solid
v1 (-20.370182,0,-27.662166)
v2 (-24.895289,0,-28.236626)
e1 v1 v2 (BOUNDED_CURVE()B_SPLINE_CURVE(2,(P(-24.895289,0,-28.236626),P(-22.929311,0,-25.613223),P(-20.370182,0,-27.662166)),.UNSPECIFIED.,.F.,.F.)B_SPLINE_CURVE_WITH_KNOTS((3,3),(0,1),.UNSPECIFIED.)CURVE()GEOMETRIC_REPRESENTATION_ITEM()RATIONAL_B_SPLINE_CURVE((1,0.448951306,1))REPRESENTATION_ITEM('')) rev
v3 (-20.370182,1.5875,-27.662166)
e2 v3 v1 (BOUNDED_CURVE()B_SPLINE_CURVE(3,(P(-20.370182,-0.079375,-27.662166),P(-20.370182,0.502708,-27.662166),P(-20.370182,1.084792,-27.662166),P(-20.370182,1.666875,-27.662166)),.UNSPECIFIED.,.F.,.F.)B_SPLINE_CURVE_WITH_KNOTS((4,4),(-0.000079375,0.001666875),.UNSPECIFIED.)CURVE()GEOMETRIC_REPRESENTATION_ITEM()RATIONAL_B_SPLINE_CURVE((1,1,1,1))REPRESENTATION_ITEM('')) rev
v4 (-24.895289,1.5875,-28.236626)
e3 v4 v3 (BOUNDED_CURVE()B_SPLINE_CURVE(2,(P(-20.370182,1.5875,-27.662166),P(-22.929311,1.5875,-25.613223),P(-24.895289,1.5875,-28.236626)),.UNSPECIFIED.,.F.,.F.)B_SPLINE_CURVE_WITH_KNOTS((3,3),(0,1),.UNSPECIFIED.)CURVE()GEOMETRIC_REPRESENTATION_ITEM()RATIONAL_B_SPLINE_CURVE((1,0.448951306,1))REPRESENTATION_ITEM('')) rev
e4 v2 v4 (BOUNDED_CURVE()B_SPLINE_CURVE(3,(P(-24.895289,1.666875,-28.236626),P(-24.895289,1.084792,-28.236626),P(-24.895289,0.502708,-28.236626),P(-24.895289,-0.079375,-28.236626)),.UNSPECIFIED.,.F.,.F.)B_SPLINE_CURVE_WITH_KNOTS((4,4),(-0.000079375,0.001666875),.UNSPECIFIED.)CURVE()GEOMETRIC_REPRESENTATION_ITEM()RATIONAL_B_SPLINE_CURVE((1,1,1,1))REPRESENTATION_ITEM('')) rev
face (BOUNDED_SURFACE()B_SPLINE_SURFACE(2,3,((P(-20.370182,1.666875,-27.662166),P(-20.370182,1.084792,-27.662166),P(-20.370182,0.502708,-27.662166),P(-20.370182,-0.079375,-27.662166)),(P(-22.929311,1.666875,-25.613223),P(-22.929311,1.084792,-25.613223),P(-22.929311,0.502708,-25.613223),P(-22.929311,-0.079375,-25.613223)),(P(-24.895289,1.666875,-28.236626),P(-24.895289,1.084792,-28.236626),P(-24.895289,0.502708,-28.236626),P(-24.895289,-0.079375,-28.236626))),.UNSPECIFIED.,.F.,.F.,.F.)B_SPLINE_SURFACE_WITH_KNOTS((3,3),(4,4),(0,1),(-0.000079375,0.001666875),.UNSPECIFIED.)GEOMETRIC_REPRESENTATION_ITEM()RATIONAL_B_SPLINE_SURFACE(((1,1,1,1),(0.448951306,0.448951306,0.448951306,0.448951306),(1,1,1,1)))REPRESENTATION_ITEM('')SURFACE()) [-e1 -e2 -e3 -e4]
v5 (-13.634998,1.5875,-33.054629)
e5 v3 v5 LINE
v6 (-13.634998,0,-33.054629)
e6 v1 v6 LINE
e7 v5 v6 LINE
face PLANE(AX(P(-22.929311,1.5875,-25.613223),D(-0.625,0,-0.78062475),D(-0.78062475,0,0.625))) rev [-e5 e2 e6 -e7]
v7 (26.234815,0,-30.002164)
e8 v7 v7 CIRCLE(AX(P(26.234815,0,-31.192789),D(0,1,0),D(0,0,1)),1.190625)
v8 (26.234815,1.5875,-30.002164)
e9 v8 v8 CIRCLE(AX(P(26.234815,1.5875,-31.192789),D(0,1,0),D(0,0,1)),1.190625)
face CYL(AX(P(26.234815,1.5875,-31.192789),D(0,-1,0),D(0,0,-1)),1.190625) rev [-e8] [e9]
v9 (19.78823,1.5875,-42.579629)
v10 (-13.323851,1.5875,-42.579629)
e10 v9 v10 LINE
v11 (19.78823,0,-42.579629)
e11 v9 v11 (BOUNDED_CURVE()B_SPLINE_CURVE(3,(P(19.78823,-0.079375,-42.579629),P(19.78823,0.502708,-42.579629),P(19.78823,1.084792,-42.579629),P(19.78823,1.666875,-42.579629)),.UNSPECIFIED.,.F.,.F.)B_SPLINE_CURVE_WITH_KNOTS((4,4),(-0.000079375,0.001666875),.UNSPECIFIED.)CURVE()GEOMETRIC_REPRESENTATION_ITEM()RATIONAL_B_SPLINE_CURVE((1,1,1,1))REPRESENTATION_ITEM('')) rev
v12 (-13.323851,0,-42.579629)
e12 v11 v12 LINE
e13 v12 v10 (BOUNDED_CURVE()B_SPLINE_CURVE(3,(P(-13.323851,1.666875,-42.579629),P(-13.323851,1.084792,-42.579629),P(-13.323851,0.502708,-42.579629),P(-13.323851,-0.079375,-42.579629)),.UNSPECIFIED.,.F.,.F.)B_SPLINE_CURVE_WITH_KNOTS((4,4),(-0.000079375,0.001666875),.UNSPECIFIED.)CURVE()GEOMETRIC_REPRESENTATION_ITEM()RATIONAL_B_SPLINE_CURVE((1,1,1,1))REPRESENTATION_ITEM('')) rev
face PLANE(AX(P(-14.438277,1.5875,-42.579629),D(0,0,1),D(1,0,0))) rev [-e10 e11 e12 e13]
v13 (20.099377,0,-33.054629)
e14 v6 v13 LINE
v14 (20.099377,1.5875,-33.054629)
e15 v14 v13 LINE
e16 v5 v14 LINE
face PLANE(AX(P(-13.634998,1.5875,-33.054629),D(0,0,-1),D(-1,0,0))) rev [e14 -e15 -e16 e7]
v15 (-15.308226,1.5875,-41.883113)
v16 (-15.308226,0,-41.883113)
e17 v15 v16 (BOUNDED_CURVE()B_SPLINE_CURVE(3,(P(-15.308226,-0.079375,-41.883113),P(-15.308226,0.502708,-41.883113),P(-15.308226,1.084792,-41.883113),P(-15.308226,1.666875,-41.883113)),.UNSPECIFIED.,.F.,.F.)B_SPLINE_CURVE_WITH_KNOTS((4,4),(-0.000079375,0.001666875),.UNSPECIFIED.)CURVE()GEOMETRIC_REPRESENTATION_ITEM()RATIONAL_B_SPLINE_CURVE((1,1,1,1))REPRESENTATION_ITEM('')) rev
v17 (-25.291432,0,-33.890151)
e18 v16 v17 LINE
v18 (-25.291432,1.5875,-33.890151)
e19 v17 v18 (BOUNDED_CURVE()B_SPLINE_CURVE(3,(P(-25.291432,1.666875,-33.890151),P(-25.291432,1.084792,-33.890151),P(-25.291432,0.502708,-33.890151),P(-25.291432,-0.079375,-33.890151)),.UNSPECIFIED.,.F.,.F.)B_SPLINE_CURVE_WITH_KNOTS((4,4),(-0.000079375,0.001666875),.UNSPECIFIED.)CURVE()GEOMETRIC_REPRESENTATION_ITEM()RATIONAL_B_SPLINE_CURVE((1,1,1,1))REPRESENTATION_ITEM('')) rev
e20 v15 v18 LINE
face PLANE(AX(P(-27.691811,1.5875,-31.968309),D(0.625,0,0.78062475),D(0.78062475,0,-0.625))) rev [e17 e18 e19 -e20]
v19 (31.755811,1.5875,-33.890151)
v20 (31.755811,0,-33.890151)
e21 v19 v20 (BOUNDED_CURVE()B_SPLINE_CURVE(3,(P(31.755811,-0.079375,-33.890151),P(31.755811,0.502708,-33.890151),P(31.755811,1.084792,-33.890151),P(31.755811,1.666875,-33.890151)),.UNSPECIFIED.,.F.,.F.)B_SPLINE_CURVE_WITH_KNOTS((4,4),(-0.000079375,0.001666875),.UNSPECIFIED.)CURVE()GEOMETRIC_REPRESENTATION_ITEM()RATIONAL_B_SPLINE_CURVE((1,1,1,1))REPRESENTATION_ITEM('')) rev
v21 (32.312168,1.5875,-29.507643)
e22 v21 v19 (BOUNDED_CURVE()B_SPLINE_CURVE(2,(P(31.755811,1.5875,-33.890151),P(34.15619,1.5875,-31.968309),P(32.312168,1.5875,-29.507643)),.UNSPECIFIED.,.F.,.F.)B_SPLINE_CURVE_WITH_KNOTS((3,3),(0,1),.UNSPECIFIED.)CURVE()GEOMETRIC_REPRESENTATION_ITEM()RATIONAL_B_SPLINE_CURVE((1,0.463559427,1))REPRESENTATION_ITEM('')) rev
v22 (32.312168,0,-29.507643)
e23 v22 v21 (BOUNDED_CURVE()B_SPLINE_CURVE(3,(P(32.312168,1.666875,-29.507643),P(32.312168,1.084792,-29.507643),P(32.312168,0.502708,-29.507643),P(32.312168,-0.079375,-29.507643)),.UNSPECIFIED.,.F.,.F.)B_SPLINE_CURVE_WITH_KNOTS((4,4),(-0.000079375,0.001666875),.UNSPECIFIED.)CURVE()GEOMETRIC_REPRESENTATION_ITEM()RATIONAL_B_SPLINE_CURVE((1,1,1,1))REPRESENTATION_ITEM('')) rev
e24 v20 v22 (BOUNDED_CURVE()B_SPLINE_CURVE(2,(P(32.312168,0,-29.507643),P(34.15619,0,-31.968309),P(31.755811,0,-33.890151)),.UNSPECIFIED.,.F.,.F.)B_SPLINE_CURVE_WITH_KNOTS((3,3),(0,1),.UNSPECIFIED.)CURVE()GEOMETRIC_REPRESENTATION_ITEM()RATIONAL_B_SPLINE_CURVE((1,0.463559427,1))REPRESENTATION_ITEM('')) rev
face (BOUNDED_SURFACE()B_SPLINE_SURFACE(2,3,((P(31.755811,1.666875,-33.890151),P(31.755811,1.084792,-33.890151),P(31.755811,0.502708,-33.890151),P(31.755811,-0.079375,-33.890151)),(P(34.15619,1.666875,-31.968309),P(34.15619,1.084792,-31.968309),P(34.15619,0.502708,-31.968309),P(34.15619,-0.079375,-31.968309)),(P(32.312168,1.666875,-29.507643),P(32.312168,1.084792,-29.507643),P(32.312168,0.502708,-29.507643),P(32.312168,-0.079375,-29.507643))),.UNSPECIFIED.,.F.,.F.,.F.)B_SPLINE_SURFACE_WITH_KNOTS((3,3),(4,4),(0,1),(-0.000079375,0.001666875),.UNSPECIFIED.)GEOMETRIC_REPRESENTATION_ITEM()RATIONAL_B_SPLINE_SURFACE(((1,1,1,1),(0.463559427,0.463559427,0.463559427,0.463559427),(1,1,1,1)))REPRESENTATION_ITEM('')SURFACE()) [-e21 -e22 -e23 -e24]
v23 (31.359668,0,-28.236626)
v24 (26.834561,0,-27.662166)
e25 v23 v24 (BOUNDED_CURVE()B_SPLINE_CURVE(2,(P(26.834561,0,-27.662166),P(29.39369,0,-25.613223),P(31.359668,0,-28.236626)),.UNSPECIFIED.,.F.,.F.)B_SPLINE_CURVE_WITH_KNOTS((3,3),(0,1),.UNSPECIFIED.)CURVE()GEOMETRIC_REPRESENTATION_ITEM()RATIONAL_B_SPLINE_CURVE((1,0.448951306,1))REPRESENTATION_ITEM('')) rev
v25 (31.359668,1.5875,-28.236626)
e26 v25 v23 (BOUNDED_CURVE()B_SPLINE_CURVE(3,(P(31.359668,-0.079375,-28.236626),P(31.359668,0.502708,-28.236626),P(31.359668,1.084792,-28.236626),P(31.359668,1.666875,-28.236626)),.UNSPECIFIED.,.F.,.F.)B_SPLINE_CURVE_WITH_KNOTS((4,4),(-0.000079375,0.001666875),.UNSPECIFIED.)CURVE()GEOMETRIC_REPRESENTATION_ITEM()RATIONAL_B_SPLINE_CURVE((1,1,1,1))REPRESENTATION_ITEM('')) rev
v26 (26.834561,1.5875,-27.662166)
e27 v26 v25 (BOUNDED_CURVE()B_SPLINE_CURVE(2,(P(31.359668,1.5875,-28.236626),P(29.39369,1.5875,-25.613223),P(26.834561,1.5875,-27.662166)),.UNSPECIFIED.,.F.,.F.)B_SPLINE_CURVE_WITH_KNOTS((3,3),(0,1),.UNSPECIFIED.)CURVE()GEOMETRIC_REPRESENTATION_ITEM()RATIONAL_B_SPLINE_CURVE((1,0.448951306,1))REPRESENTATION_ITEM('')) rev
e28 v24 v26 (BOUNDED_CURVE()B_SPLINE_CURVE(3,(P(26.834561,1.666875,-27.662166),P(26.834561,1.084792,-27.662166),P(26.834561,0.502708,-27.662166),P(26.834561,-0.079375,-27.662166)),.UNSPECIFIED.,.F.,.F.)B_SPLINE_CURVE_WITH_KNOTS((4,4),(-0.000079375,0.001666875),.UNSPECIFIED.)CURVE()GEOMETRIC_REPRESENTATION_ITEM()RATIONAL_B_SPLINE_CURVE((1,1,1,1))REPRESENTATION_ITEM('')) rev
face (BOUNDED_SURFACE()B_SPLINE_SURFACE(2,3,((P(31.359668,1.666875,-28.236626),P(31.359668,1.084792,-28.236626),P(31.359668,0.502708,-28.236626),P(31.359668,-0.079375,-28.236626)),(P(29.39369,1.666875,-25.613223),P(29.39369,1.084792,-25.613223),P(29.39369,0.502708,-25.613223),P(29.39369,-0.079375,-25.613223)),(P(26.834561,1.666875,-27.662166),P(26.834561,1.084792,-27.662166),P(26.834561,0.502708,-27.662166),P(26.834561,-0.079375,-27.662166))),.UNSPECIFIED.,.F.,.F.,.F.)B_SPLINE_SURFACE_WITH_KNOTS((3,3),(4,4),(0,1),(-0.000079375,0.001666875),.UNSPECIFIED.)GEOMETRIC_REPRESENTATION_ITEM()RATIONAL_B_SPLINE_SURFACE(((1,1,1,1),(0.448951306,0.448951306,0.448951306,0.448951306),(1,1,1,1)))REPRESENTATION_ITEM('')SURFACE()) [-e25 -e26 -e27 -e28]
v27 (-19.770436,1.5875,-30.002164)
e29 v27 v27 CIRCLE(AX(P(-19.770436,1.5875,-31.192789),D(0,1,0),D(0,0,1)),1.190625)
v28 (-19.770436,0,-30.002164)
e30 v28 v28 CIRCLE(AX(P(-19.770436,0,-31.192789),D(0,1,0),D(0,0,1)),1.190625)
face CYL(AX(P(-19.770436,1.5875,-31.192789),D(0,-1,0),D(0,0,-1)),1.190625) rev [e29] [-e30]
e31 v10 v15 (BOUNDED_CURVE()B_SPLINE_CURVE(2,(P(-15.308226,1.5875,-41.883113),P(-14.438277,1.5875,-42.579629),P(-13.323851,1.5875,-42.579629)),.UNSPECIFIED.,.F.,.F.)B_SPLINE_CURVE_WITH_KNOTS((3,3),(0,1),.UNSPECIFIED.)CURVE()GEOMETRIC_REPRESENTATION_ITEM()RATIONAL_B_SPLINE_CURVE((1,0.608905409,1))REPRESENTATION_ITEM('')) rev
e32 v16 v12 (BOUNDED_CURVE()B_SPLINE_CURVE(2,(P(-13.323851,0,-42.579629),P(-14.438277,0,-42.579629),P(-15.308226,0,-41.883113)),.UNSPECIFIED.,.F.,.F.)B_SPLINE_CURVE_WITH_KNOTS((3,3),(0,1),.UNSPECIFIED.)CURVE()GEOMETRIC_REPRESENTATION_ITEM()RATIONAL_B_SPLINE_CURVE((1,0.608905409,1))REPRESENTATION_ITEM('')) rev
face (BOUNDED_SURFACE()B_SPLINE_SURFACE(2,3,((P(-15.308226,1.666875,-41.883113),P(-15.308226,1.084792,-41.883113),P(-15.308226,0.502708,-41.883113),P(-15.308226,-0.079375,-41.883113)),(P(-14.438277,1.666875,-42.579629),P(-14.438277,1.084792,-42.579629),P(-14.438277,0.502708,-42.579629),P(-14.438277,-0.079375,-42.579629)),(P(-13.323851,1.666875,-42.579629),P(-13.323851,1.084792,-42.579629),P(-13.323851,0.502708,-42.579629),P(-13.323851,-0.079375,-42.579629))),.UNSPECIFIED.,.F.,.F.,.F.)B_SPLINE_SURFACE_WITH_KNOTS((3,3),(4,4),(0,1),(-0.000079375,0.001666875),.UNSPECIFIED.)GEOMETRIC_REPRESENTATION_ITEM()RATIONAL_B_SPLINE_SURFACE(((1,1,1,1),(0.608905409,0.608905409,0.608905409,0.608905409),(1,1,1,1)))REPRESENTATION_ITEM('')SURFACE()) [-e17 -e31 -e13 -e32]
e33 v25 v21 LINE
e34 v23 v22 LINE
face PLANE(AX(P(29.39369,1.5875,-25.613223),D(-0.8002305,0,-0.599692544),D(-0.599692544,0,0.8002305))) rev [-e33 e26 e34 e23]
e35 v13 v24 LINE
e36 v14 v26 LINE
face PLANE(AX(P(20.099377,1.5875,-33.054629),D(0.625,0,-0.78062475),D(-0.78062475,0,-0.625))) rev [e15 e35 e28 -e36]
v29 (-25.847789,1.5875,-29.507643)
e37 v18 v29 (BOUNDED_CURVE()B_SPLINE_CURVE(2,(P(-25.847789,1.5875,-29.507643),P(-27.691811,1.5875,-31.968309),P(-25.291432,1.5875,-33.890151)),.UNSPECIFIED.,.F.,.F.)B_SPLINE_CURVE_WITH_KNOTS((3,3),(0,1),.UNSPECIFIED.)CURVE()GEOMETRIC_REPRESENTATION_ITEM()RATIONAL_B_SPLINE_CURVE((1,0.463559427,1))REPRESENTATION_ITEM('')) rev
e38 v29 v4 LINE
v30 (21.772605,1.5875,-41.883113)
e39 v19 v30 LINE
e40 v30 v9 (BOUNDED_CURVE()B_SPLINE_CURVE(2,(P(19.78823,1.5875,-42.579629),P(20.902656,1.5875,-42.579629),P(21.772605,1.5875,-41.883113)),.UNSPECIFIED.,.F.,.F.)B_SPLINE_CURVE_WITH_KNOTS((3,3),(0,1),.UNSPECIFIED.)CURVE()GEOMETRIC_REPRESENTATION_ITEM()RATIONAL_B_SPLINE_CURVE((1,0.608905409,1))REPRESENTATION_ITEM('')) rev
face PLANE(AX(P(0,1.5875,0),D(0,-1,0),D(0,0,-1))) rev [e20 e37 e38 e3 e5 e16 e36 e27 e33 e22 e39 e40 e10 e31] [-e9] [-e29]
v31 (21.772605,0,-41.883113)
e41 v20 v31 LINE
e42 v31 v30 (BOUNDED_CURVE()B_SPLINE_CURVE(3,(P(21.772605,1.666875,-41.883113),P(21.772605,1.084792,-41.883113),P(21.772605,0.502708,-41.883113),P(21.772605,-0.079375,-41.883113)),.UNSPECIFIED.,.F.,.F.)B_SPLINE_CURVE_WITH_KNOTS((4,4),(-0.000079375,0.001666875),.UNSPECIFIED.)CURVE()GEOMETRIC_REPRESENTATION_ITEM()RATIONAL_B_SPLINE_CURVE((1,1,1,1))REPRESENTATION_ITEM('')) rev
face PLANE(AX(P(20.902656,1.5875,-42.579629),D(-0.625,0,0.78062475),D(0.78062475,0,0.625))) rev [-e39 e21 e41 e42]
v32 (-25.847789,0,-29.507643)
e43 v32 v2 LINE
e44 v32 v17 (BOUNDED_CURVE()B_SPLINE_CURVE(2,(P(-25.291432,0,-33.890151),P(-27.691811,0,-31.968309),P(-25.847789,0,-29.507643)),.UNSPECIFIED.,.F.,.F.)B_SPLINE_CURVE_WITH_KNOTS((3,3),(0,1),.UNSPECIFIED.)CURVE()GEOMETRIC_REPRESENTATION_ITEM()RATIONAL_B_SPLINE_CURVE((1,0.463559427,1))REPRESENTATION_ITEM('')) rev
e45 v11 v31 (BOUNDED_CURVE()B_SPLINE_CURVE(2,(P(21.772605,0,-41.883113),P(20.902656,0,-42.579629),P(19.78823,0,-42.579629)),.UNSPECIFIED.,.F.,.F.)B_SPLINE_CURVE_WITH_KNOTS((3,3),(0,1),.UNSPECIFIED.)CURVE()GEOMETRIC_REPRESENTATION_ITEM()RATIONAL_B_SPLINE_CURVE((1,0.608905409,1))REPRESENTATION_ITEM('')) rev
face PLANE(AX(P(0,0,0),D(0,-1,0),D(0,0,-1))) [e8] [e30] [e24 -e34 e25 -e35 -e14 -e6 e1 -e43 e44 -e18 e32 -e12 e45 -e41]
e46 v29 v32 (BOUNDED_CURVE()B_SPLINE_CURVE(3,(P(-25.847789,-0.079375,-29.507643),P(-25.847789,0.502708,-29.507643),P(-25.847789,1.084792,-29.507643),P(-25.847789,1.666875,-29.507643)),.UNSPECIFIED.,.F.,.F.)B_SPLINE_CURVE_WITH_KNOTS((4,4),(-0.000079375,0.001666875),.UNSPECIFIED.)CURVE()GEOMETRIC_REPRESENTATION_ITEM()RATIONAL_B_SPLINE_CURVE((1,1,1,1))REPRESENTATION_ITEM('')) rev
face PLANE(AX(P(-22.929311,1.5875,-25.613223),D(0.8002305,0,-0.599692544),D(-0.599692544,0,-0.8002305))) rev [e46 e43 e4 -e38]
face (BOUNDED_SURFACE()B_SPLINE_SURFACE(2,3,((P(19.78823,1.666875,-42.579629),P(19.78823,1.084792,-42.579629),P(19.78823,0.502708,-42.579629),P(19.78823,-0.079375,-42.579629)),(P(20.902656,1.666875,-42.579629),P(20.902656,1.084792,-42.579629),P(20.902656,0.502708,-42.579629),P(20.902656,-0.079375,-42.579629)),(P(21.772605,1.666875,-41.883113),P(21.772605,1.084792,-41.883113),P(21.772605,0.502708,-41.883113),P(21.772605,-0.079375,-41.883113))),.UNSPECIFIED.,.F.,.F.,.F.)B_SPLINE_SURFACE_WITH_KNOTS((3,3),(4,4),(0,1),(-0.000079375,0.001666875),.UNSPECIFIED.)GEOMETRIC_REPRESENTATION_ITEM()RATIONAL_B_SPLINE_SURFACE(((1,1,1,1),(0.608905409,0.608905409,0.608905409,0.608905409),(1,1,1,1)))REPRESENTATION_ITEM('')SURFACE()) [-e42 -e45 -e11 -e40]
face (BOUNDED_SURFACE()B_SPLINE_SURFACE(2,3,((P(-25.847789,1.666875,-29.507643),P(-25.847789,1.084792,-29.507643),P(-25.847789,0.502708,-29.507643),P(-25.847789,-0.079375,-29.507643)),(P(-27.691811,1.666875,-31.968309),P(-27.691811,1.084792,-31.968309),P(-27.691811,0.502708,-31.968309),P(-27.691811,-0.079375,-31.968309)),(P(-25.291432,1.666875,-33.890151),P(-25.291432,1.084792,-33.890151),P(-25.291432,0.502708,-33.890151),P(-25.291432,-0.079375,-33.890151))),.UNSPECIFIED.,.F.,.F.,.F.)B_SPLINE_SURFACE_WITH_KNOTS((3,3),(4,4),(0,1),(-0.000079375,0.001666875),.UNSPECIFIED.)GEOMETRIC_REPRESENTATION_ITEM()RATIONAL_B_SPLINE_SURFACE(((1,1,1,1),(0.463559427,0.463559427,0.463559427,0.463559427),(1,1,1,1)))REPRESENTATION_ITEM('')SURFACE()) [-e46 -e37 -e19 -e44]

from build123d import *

# Parameters (mm, degrees)
SKETCH3_R           = 1.190625
BOSS_EXTRUDE1_DEPTH = 1.5875


with BuildPart() as part:
    # Sketch3 → Boss-Extrude1 (new body)
    with BuildSketch(Plane(origin=(0, 0, 0), x_dir=(1, 0, 0), z_dir=(0, 1, 0))):
        Polygon((-22.929311402, 25.613223092), (-13.634997975, 33.054629342), (20.099377025, 33.054629342), (29.393690453, 25.613223092), (34.156190453, 31.968309197), (24.861877025, 39.409715447), (20.902655838, 42.579629342), (-14.438276788, 42.579629342), (-18.397497975, 39.409715447), (-27.691811402, 31.968309197), align=None)
        with Locations(Location((-19.770435938, 31.192788903, 0), (0, 0, 270))):
            Circle(SKETCH3_R, mode=Mode.SUBTRACT)
        with Locations(Location((26.234814989, 31.192788903, 0), (0, 0, 270))):
            Circle(SKETCH3_R, mode=Mode.SUBTRACT)
    extrude(amount=BOSS_EXTRUDE1_DEPTH)

    # Fillet1
    # a fillet whose section is not a circle: 3.175 mm, written as the material it takes off along each edge
    with BuildSketch(Plane(origin=(-22.929311402, -8.195772914, -25.613223092), x_dir=(0.7806247497998012, 0, -0.6249999999999982), z_dir=(0, 1, 0)), Plane(origin=(29.393690453, -8.195772914, -25.613223092), x_dir=(0.5996925441644039, 0, -0.8002304995897274), z_dir=(0, 1, 0))) as fillet1_piece_1:
        with BuildLine():
            Bezier((3.278309166, 0), (0, 0), (0.104936119, 3.276629273), weights=[1, 0.448951306, 1])
            Line((0.104936119, 3.276629273), (0, 0))
            Line((0, 0), (3.278309166, 0))
        make_face()
    extrude(amount=17.979045828, mode=Mode.SUBTRACT)
    with BuildSketch(Plane(origin=(-27.691811402, -7.687366025, -31.968309197), x_dir=(0.7806247497998011, 0, -0.6249999999999983), z_dir=(0, 1, 0))) as fillet1_piece_2:
        with BuildLine():
            Bezier((3.07494641, 0), (0, 0), (-0.098426636, -3.073370727), weights=[1, 0.463559427, 1])
            Line((-0.098426636, -3.073370727), (0, 0))
            Line((0, 0), (3.07494641, 0))
        make_face()
    extrude(amount=16.962232051, mode=Mode.SUBTRACT)
    with BuildSketch(Plane(origin=(34.156190453, -7.687366025, -31.968309197), x_dir=(-0.7806247497995835, 0, -0.62500000000027), z_dir=(0, 1, 0))) as fillet1_piece_3:
        with BuildLine():
            Bezier((3.07494641, 0), (0, 0), (-0.098426636, 3.073370727), weights=[1, 0.463559427, 1])
            Line((-0.098426636, 3.073370727), (0, 0))
            Line((0, 0), (3.07494641, 0))
        make_face()
    extrude(amount=16.962232051, mode=Mode.SUBTRACT)
    with BuildSketch(Plane(origin=(20.902655838, -2.786065678, -42.579629342), x_dir=(-1, 0, 0), z_dir=(0, 1, 0)), Plane(origin=(-14.438276788, -2.786065678, -42.579629342), x_dir=(-0.780624749799802, 0, 0.6249999999999972), z_dir=(0, 1, 0))) as fillet1_piece_4:
        with BuildLine():
            Bezier((1.114426271, 0), (0, 0), (-0.869948729, 0.696516419), weights=[1, 0.608905409, 1])
            Line((-0.869948729, 0.696516419), (0, 0))
            Line((0, 0), (1.114426271, 0))
        make_face()
    extrude(amount=7.159631355, mode=Mode.SUBTRACT)


solid = part.part
